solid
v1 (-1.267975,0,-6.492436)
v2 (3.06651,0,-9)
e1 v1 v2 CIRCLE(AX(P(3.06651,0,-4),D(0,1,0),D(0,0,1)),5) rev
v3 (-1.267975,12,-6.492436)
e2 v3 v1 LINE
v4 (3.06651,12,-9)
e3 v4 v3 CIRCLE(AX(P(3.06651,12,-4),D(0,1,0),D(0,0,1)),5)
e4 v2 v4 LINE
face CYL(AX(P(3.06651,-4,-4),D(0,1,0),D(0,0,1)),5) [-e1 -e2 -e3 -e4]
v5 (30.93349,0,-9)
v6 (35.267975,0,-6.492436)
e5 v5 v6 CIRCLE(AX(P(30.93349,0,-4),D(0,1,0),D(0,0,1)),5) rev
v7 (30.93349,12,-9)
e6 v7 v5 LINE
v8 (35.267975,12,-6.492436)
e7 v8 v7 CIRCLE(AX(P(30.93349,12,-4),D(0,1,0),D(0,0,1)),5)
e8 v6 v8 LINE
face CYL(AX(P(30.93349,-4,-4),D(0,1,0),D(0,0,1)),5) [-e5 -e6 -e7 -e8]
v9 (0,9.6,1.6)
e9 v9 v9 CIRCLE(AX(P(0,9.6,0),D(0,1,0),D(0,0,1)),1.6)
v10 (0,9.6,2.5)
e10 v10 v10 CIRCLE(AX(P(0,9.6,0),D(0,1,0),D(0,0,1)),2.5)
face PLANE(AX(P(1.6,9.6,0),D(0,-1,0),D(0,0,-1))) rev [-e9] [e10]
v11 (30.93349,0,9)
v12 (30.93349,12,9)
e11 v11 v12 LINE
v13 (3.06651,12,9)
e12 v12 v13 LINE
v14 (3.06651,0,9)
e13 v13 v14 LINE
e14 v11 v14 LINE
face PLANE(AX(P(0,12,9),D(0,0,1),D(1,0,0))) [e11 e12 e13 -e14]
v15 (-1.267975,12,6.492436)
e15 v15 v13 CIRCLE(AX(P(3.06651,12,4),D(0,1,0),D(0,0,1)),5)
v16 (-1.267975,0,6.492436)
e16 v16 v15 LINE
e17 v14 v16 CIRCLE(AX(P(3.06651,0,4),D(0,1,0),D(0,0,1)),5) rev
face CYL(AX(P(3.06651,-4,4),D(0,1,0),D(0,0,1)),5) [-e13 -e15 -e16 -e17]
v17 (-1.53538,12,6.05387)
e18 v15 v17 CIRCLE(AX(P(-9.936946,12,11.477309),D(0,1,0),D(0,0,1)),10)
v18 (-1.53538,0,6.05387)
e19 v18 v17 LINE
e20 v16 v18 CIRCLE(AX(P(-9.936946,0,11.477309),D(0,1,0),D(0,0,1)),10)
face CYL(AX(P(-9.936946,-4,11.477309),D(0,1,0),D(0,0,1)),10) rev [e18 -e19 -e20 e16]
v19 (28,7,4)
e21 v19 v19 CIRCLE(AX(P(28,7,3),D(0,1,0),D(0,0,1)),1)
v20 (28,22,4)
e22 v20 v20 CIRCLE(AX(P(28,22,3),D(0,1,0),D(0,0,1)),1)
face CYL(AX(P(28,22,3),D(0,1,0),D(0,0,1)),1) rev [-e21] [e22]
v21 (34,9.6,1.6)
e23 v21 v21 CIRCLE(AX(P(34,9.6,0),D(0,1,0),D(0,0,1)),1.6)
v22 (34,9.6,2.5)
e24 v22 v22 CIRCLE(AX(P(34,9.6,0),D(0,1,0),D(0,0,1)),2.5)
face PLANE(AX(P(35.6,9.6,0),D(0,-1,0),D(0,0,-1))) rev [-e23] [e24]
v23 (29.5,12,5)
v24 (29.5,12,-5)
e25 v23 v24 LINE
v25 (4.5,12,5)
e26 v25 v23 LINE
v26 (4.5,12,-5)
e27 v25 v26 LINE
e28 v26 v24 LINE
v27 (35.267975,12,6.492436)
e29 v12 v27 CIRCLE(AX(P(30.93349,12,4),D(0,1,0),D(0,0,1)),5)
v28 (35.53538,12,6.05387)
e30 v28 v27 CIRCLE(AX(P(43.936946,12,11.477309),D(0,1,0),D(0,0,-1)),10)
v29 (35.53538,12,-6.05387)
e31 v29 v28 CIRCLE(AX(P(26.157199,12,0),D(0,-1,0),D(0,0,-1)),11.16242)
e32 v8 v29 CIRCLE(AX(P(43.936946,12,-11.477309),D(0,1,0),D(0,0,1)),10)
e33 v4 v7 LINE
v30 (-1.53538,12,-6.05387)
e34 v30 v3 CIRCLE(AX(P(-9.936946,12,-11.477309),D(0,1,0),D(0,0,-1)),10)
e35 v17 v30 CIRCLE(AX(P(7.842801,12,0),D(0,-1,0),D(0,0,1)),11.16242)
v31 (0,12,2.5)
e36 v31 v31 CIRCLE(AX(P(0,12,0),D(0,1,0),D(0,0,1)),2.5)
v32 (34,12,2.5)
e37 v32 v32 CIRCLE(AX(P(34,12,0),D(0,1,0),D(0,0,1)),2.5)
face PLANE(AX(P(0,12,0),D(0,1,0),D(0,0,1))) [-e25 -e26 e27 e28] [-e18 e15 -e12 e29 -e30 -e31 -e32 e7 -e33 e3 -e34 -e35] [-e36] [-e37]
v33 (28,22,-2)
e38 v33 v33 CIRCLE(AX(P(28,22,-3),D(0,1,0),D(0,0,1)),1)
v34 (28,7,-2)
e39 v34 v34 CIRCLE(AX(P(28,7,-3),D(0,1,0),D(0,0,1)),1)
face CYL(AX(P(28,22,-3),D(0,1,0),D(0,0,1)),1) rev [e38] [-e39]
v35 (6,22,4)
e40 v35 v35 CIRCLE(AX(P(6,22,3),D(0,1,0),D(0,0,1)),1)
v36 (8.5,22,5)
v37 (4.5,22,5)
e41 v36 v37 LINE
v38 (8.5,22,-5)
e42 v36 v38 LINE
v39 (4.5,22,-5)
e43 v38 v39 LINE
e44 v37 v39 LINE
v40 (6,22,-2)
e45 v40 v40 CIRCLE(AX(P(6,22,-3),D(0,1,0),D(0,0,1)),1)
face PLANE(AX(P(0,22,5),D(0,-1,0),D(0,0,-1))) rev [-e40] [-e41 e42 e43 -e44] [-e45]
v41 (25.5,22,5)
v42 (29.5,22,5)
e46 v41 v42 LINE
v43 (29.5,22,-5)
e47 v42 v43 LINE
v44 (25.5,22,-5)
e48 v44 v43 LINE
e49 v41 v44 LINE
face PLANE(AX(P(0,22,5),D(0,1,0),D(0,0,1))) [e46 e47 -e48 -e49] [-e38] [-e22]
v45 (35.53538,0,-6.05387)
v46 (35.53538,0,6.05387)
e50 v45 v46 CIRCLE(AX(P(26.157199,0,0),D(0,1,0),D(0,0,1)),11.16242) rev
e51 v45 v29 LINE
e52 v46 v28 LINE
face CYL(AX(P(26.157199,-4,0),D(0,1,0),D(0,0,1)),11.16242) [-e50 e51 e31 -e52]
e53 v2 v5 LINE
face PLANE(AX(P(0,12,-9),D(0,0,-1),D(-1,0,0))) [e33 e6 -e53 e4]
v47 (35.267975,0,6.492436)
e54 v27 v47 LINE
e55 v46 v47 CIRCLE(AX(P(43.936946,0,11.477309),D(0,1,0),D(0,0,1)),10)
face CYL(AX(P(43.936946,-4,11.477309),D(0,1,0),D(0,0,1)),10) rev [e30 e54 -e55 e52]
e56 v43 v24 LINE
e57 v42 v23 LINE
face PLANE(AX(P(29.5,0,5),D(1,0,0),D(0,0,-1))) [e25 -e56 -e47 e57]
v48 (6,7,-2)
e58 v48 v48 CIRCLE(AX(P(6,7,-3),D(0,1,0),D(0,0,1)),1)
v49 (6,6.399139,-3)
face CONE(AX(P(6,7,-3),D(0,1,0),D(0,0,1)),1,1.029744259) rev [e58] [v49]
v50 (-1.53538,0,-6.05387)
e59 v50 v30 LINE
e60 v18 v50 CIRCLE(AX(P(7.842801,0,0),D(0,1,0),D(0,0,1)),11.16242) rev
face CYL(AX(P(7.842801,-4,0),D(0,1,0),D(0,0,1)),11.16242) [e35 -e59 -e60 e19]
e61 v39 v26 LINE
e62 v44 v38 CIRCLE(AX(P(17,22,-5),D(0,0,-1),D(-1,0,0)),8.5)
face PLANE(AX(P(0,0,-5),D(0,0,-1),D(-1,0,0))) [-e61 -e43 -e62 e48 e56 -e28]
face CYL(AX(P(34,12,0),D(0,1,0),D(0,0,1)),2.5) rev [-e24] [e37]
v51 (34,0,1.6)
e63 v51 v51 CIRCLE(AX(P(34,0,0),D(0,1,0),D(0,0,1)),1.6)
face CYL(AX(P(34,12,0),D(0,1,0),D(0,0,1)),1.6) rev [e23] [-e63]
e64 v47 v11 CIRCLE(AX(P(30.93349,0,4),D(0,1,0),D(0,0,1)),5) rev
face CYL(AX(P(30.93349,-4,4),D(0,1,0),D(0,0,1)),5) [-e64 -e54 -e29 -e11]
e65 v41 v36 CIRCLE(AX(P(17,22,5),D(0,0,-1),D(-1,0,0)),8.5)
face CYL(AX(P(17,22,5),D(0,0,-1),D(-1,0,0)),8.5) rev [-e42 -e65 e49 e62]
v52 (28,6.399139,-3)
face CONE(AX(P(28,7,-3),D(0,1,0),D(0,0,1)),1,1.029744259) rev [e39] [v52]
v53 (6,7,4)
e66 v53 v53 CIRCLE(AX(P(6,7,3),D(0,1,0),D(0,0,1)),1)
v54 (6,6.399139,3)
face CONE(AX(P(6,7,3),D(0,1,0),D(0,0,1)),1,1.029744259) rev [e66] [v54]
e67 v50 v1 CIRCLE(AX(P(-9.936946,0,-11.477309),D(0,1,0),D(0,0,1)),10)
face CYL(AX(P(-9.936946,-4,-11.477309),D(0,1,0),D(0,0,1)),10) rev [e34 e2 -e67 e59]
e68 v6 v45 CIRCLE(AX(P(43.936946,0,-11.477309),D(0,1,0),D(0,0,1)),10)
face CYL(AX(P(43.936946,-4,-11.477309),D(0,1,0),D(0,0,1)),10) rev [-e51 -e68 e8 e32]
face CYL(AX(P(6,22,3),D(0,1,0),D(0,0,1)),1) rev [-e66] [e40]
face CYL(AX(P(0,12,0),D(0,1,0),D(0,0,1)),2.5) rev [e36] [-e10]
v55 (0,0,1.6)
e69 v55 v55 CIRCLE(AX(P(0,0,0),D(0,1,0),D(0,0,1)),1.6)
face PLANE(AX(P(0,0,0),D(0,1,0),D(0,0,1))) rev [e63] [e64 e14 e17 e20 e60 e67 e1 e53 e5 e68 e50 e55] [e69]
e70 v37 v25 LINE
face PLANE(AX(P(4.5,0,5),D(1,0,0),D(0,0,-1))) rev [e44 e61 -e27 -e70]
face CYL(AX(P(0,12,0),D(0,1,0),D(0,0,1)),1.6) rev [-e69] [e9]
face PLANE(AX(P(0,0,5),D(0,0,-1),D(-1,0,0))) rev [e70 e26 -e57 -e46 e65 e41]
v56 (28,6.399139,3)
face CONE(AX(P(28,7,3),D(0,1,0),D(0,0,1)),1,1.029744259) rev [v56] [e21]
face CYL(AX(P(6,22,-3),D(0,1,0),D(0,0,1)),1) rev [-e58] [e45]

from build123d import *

# Parameters (mm, degrees)
CROQUIS2_W                                           = 47.2
CROQUIS2_H                                           = 18
SALIENTE_EXTRUIR1_DEPTH                              = 12
SALIENTE_EXTRUIR2_DEPTH                              = 5
SALIENTE_EXTRUIR2_DEPTH_BACK                         = 5
REFRENTADO_PARA_TORNILLO_CON_CABEZA_TRON_D           = 3.2
REFRENTADO_PARA_TORNILLO_CON_CABEZA_TRON_DEPTH       = 30
REFRENTADO_PARA_TORNILLO_CON_CABEZA_TRON_CBORE_D     = 5
REFRENTADO_PARA_TORNILLO_CON_CABEZA_TRON_CBORE_DEPTH = 2.4
REFRENTADO_PARA_TORNILLO_CON_CABEZA_TRON_TIP         = 0.96137699
TALADRO_DE_MARGEN_PARA_M21_D                         = 2
TALADRO_DE_MARGEN_PARA_M21_DEPTH                     = 15
TALADRO_DE_MARGEN_PARA_M21_TIP                       = 0.600860619
CROQUIS14_R                                          = 10
CORTAR_EXTRUIR1_DEPTH                                = 16
REDONDEO1_R                                          = 6
CORTAR_EXTRUIR2_DEPTH                                = 16
REDONDEO2_R                                          = 5
REDONDEO3_R                                          = 5


with BuildPart() as part:
    # Croquis2 → Saliente-Extruir1 (new body)
    with BuildSketch(Plane(origin=(0, 0, 0), x_dir=(1, 0, 0), z_dir=(0, 1, 0))):
        with Locations((17, 0)):
            Rectangle(CROQUIS2_W, CROQUIS2_H)
    extrude(amount=SALIENTE_EXTRUIR1_DEPTH)

    # Croquis4 → Saliente-Extruir2 (add, two sides: drawn at the far end of the back side and taken through both)
    with BuildSketch(Plane(origin=(0, 0, 0), x_dir=(-1, 0, 0), z_dir=(0, 0, -1)).offset(-SALIENTE_EXTRUIR2_DEPTH_BACK)):
        with BuildLine():
            Line((-25.5, 22), (-29.5, 22))
            Line((-29.5, 22), (-29.5, 12))
            Line((-29.5, 12), (-4.5, 12))
            Line((-4.5, 12), (-4.5, 22))
            Line((-4.5, 22), (-8.5, 22))
            ThreePointArc((-8.5, 22), (-17, 13.5), (-25.5, 22))
        make_face()
    extrude(amount=SALIENTE_EXTRUIR2_DEPTH + SALIENTE_EXTRUIR2_DEPTH_BACK)

    # Refrentado para tornillo con cabeza troncocónica de M31
    with Locations(Plane.ZX.offset(12)):
        with Locations((0, 0), (0, 34)):
            CounterBoreHole(REFRENTADO_PARA_TORNILLO_CON_CABEZA_TRON_D / 2, REFRENTADO_PARA_TORNILLO_CON_CABEZA_TRON_CBORE_D / 2, REFRENTADO_PARA_TORNILLO_CON_CABEZA_TRON_CBORE_DEPTH, depth=REFRENTADO_PARA_TORNILLO_CON_CABEZA_TRON_DEPTH)
            with Locations((0, 0, -(REFRENTADO_PARA_TORNILLO_CON_CABEZA_TRON_DEPTH + REFRENTADO_PARA_TORNILLO_CON_CABEZA_TRON_TIP / 2))):  # 118° drill point
                Cone(0, REFRENTADO_PARA_TORNILLO_CON_CABEZA_TRON_D / 2, REFRENTADO_PARA_TORNILLO_CON_CABEZA_TRON_TIP, mode=Mode.SUBTRACT)

    # Taladro de margen para M21
    with Locations(Plane(origin=(6, 22, -3), x_dir=(0, 0, 1), z_dir=(0, 1, 0))):
        with Locations((0, 0), (6, 0), (0, 22), (6, 22)):
            Hole(TALADRO_DE_MARGEN_PARA_M21_D / 2, depth=TALADRO_DE_MARGEN_PARA_M21_DEPTH)
            with Locations((0, 0, -(TALADRO_DE_MARGEN_PARA_M21_DEPTH + TALADRO_DE_MARGEN_PARA_M21_TIP / 2))):  # 118° drill point
                Cone(0, TALADRO_DE_MARGEN_PARA_M21_D / 2, TALADRO_DE_MARGEN_PARA_M21_TIP, mode=Mode.SUBTRACT)

    # Croquis14 → Cortar-Extruir1 (cut)
    with BuildSketch(Plane(origin=(0, 12, 0), x_dir=(1, 0, 0), z_dir=(0, 1, 0))):
        with Locations((43.936945617, 11.477309168)):
            Circle(CROQUIS14_R)
        with Locations((-9.936945617, 11.477309168)):
            Circle(CROQUIS14_R)
        with Locations((43.936945617, -11.477309168)):
            Circle(CROQUIS14_R)
        with Locations((-9.936945617, -11.477309168)):
            Circle(CROQUIS14_R)
    extrude(amount=-CORTAR_EXTRUIR1_DEPTH, mode=Mode.SUBTRACT)

    # Redondeo1
    # the kernel refuses this fillet: 6 mm, written as the material it takes off along each edge
    with BuildSketch(Plane(origin=(-6.6, -8.915795606, -2.050496666), x_dir=(0, 0, 1), z_dir=(0, 1, 0))) as redondeo1_piece_1:
        with BuildLine():
            CenterArc((3.566318242, 6), REDONDEO1_R, 215.701262203, 54.298737797)
            ThreePointArc((-1.306105787, 2.498645393), (-0.564551793, 1.295584483), (0, 0))
            Line((0, 0), (3.566318242, 0))
        make_face()
    extrude(amount=29.831591212, mode=Mode.SUBTRACT)
    with BuildSketch(Plane(origin=(-6.6, -8.915795606, 2.050496666), x_dir=(0, 0, -1), z_dir=(0, 1, 0)), Plane(origin=(40.6, -8.915795606, -2.050496666), x_dir=(0, 0, 1), z_dir=(0, 1, 0))) as redondeo1_piece_2:
        with BuildLine():
            CenterArc((3.566318242, -6), REDONDEO1_R, 90, 54.298737797)
            ThreePointArc((-1.306105787, -2.498645393), (-0.564551793, -1.295584483), (0, 0))
            Line((0, 0), (3.566318242, 0))
        make_face()
    extrude(amount=29.831591212, mode=Mode.SUBTRACT)
    with BuildSketch(Plane(origin=(40.6, -8.915795606, 2.050496666), x_dir=(-0.886226070867775, 0, 0.46325301004339436), z_dir=(0, 1, 0))) as redondeo1_piece_3:
        with BuildLine():
            CenterArc((3.665248765, -5.940082264), REDONDEO1_R, 98.104043871, 54.298737797)
            Line((-1.652107661, -3.160564203), (0, 0))
            ThreePointArc((0, 0), (1.409711063, -0.099862894), (2.819422127, 0))
        make_face()
    extrude(amount=29.831591212, mode=Mode.SUBTRACT)

    # Croquis15 → Cortar-Extruir2 (cut)
    with BuildSketch(Plane(origin=(0, 12, 0), x_dir=(1, 0, 0), z_dir=(0, 1, 0))):
        with BuildLine():
            ThreePointArc((-1.535379674, 6.05387025), (-3.319618886, 0), (-1.535379674, -6.05387025))
            ThreePointArc((-1.535379674, -6.05387025), (-2.691742174, -4.584775013), (-4.101354607, -3.356602453))
            ThreePointArc((-4.101354607, -3.356602453), (-5.546762714, -1.879695859), (-6.405366909, 0))
            ThreePointArc((-6.405366909, 0), (-5.546762714, 1.879695859), (-4.101354607, 3.356602453))
            ThreePointArc((-4.101354607, 3.356602453), (-2.691742174, 4.584775013), (-1.535379674, 6.05387025))
        make_face()
        with BuildLine():
            ThreePointArc((38.101354607, 3.356602453), (36.691742174, 4.584775013), (35.535379674, 6.05387025))
            ThreePointArc((35.535379674, 6.05387025), (37.319618886, 0), (35.535379674, -6.05387025))
            ThreePointArc((35.535379674, -6.05387025), (36.691742174, -4.584775013), (38.101354607, -3.356602453))
            ThreePointArc((38.101354607, -3.356602453), (39.546762714, -1.879695859), (40.405366909, 0))
            ThreePointArc((40.405366909, 0), (39.546762714, 1.879695859), (38.101354607, 3.356602453))
        make_face()
    extrude(amount=-CORTAR_EXTRUIR2_DEPTH, mode=Mode.SUBTRACT)

    # Redondeo2
    redondeo2_edges = [part.edges().sort_by_distance(p)[0] for p in [
        (34.248656848, 6, -9),
        (-0.248656848, 6, -9),
    ]]
    fillet(redondeo2_edges, radius=REDONDEO2_R)

    # Redondeo3
    redondeo3_edges = [part.edges().sort_by_distance(p)[0] for p in [
        (34.248656848, 6, 9),
        (-0.248656848, 6, 9),
    ]]
    fillet(redondeo3_edges, radius=REDONDEO3_R)


solid = part.part
